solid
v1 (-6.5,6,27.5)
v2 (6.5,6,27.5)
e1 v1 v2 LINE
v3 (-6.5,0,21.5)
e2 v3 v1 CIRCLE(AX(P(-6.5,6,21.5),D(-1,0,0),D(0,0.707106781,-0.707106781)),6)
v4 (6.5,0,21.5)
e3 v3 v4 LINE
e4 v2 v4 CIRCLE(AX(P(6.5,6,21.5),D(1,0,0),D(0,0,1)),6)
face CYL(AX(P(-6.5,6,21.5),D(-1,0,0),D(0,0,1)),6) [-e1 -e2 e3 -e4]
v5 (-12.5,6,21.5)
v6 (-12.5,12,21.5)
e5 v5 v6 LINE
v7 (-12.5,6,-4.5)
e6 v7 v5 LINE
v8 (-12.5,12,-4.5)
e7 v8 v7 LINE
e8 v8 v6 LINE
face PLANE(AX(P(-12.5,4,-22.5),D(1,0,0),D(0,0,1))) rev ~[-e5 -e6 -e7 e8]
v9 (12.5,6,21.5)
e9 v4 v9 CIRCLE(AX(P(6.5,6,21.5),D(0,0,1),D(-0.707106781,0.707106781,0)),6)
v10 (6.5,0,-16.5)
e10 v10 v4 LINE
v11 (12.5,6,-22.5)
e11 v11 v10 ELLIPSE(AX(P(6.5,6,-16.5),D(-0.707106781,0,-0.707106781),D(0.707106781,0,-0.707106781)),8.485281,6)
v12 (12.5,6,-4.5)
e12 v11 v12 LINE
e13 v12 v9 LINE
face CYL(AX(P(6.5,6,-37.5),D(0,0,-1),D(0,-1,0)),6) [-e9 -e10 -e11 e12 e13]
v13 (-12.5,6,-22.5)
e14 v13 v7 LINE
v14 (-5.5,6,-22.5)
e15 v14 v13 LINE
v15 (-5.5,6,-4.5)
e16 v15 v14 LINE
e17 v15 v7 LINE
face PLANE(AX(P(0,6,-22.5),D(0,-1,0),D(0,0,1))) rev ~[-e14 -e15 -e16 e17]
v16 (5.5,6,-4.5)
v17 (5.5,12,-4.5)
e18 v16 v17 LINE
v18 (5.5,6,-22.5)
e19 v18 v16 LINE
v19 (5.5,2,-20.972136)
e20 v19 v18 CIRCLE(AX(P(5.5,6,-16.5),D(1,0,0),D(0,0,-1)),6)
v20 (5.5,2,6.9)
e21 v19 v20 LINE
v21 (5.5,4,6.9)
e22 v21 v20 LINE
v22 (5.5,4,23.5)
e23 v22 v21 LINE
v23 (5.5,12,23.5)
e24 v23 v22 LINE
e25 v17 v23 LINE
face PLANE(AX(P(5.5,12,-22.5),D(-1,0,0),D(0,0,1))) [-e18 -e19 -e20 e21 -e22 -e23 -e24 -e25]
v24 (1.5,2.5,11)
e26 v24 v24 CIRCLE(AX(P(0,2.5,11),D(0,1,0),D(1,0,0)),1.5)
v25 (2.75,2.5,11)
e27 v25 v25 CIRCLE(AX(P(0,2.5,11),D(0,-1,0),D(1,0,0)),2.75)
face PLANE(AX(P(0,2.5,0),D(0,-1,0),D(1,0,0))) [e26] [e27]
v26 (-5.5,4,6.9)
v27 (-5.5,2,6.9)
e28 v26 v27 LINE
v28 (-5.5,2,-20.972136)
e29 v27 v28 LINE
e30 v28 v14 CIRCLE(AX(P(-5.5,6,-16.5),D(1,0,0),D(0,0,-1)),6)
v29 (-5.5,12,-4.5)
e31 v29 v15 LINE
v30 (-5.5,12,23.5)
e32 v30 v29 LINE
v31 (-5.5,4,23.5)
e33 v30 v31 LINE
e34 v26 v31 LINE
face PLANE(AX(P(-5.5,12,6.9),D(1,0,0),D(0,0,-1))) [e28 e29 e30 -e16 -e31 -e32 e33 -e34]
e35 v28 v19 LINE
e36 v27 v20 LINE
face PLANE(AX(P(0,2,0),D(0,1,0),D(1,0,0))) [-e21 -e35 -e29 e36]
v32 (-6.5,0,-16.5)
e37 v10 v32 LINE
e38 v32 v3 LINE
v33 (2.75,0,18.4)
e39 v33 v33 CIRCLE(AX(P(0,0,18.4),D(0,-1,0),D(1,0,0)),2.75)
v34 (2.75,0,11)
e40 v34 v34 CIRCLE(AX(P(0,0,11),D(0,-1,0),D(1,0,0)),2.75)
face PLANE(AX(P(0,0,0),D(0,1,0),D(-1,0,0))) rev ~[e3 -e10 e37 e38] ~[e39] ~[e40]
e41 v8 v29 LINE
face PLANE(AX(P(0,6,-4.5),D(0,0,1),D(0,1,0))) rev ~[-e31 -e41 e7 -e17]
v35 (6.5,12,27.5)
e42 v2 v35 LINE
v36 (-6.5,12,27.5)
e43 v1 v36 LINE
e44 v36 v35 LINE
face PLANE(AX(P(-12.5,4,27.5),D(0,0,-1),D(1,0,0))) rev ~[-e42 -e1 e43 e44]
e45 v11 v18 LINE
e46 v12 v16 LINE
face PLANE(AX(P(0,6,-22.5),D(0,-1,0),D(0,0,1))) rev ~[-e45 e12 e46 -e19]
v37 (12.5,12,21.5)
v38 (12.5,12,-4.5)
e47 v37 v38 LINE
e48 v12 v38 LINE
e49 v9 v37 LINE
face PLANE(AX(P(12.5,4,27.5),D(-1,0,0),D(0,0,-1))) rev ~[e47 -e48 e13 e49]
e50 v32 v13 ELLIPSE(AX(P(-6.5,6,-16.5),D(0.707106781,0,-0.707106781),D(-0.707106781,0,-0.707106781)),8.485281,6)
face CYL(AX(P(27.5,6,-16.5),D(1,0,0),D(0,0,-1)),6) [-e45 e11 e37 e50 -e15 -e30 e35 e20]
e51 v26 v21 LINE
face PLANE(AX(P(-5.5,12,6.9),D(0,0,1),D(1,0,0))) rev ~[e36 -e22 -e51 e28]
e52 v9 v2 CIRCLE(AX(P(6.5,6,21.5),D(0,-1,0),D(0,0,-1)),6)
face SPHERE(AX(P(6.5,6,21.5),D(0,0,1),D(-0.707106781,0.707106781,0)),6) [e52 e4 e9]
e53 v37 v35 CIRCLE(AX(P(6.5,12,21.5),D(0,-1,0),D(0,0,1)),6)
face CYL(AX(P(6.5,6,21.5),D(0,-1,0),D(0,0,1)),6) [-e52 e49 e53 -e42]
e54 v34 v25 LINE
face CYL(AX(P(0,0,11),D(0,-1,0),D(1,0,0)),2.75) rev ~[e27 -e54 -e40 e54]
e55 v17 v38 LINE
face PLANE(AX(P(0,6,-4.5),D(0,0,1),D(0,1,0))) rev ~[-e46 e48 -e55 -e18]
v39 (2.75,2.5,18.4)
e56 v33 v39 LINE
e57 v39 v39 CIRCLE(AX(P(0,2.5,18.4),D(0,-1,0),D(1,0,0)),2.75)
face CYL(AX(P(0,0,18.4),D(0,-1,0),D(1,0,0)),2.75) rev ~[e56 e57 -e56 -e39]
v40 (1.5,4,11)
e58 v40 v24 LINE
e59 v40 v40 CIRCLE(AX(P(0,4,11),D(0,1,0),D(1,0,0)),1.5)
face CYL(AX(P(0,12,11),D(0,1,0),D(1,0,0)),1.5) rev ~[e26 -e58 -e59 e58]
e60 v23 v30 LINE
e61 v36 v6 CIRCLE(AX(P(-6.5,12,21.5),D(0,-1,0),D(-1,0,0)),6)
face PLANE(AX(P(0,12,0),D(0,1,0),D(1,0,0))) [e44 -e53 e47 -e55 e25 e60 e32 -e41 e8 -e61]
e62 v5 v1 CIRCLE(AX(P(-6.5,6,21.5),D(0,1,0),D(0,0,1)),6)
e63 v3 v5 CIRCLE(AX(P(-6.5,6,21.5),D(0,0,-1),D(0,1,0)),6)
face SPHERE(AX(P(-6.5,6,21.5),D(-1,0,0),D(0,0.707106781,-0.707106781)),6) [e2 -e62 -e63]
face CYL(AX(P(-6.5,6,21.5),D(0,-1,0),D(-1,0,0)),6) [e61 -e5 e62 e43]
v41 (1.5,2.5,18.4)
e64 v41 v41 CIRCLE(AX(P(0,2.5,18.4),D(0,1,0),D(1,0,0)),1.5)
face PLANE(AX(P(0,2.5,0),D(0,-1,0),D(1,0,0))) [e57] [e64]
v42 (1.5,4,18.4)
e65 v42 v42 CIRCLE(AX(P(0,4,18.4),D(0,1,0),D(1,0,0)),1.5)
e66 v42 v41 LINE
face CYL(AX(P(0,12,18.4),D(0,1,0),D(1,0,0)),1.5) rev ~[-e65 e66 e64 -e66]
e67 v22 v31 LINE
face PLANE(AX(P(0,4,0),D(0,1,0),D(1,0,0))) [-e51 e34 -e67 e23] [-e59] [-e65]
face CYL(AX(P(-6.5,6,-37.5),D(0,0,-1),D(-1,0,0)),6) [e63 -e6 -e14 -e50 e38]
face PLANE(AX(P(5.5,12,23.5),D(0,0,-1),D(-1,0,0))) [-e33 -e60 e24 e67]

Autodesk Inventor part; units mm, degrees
ref_plane "YZ Plane" through (0, 0, 0) normal (1, 0, 0) x (0, 1, 0)
ref_plane "XZ Plane" through (0, 0, 0) normal (0, 1, 0) x (-1, 0, 0)
ref_plane "XY Plane" through (0, 0, 0) normal (0, 0, 1) x (1, 0, 0)
sketch "スケッチ1" plane through (0, 0, 0) normal (0, 1, 0) x (-1, 0, 0)
  line L0 (12.5, 22.5) -> (-12.5, 22.5)
  line L1 (-12.5, 22.5) -> (-12.5, -22.5)
  line L2 (-12.5, -22.5) -> (12.5, -22.5)
  line L3 (12.5, -22.5) -> (12.5, 22.5)
  line L4 (12.5, 22.5) -> (-12.5, -22.5) construction
  line L5 (-12.5, 22.5) -> (12.5, -22.5) construction
  line L6 (12.5, 22.5) -> (12.5, 27.5)
  line L7 (12.5, 27.5) -> (-12.5, 27.5)
  line L8 (-12.5, 27.5) -> (-12.5, 22.5)
  point P0 (0, 0)
  dimension "d0" = 45
  dimension "d2" = 25
  dimension "d3" = 5
extrude "押し出し1" add sketch "スケッチ1" along normal blind 2
sketch "スケッチ2" plane through (0, 2, 0) normal (0, 1, 0) x (1, 0, 0)
  line L0 (-12.5, -27.5) -> (12.5, -27.5) construction
  line L1 (12.5, -27.5) -> (12.5, 22.5) construction
  line L2 (12.5, 22.5) -> (-12.5, 22.5) construction
  line L3 (-12.5, 22.5) -> (-12.5, -27.5) construction
  line L4 (0, 32.5) -> (0, -37.5) construction
  line L5 (-12.5, -27.5) -> (12.5, -27.5)
  line L6 (12.5, -27.5) -> (12.5, 22.5)
  line L7 (12.5, 22.5) -> (-12.5, 22.5)
  line L8 (-12.5, 22.5) -> (-12.5, -27.5)
  line L9 (-12.5, 22.5) -> (-12.5, -27.5) projected
  line L10 (12.5, 22.5) -> (-12.5, 22.5) projected
  point P0 (0, 0)
  point P1 (0, -27.5)
extrude "押し出し2" add sketch "スケッチ2" along normal blind 2
sketch "スケッチ3" plane through (0, 4, 0) normal (0, 1, 0) x (1, 0, 0)
  line L0 (-12.5, 22.5) -> (-12.5, -2) construction
  line L1 (-12.5, -2) -> (12.5, -2) construction
  line L2 (12.5, -2) -> (12.5, 22.5) construction
  line L3 (12.5, 22.5) -> (-12.5, 22.5) construction
  line L4 (-12.5, 22.5) -> (-12.5, -2) construction
  line L5 (-12.5, -27.5) -> (12.5, -27.5)
  line L6 (12.5, -27.5) -> (12.5, 22.5)
  line L7 (12.5, 22.5) -> (-12.5, 22.5)
  line L8 (-12.5, 22.5) -> (-12.5, -27.5)
  line L9 (-12.5, -27.5) -> (12.5, -27.5) construction
  point P0 (0, 0)
extrude "押し出し3" add sketch "スケッチ3" along normal blind 8
sketch "スケッチ4" plane through (0, 12, 0) normal (0, 1, 0) x (1, 0, 0)
  line L0 (12.5, -2) -> (12.5, 22.5) construction
  line L1 (-5.5, 22.5) -> (5.5, 22.5)
  line L2 (5.5, 22.5) -> (5.5, -23.5)
  line L3 (5.5, -23.5) -> (-5.5, -23.5)
  line L4 (-5.5, -23.5) -> (-5.5, 22.5)
  line L5 (0, 32.5) -> (0, -37.5) construction
  circle A0 centre (0, -18.4) radius 1.5
  circle A1 centre (0, -11) radius 1.5
  line L6 (-17.5, 0) -> (17.5, 0) construction
  line L7 (-5.5, -6.9) -> (5.5, -6.9)
  line L8 (12.5, -27.5) -> (12.5, 22.5) construction
  line L9 (12.5, 22.5) -> (-12.5, 22.5) construction
  line L10 (-12.5, 22.5) -> (-12.5, -27.5) construction
  line L11 (-12.5, -27.5) -> (12.5, -27.5) construction
  line L12 (12.5, 22.5) -> (-12.5, 22.5) projected
  point P0 (0, 0)
  point P1 (0, -23.5)
  dimension "d14" = 11
  dimension "d15" = 3
  dimension "d16" = 7.4
  dimension "d17" = 22
  dimension "d24" = 16.6
  dimension "d27" = 46
extrude "押し出し4" cut sketch "スケッチ4" against normal blind 8 contours L1 L2 L7 L4 | L7 L2 L3 L4 | A0 | A1
extrude "押し出し5" cut sketch "スケッチ4" against normal through all contours A0 | A1
extrude "押し出し6" cut sketch "スケッチ4" against normal blind 10 contours L1 L2 L7 L4
sketch "スケッチ5" plane through (0, 0, 0) normal (0, -1, 0) x (1, 0, 0)
  circle A0 centre (0, 18.4) radius 1.5 construction
  circle A1 centre (0, 11) radius 1.5 construction
  circle A2 centre (0, 18.4) radius 2.75
  circle A3 centre (0, 11) radius 2.75
  point P0 (0, 0)
  dimension "d28" = 5.5
extrude "押し出し7" cut sketch "スケッチ5" against normal blind 2.5
fillet "フィレット1" radius 6 6 edges at (12.5, 0, 2.5) (-12.5, 0, 2.5) (0, 0, 27.5) (12.5, 6, 27.5) (-12.5, 6, 27.5) (0, 0, -22.5)
sketch "スケッチ6" plane through (0, 0, 0) normal (1, 0, 0) x (0, 1, 0)
  line L0 (12, 23.5) -> (12, -22.5) construction
  line L1 (12, -22.5) -> (2, -22.5) construction
  line L2 (12, -22.5) -> (6, -22.5)
  line L3 (6, -22.5) -> (6, -4.5)
  line L4 (6, -4.5) -> (12, -4.5)
  line L5 (12, -4.5) -> (12, -22.5)
  point P0 (0, 0)
  dimension "d32" = 6
  dimension "d33" = 18
extrude "押し出し8" cut sketch "スケッチ6" along normal through all both and the other way through all
sketch "スケッチ7" plane through (0, 12, 0) normal (0, 1, 0) x (1, 0, 0)
  line L0 (5.5, -6.9) -> (-5.5, -6.9) projected
  line L1 (-28.6346, -6.9) -> (35.9523, -6.9)
  line L2 (35.9523, -6.9) -> (35.9523, 63.9707)
  line L3 (35.9523, 63.9707) -> (-28.6346, 63.9707)
  line L4 (-28.6346, 63.9707) -> (-28.6346, -6.9)
  point P0 (0, 0)
properties part number "pressure_plate" material "ABS プラスチック"
